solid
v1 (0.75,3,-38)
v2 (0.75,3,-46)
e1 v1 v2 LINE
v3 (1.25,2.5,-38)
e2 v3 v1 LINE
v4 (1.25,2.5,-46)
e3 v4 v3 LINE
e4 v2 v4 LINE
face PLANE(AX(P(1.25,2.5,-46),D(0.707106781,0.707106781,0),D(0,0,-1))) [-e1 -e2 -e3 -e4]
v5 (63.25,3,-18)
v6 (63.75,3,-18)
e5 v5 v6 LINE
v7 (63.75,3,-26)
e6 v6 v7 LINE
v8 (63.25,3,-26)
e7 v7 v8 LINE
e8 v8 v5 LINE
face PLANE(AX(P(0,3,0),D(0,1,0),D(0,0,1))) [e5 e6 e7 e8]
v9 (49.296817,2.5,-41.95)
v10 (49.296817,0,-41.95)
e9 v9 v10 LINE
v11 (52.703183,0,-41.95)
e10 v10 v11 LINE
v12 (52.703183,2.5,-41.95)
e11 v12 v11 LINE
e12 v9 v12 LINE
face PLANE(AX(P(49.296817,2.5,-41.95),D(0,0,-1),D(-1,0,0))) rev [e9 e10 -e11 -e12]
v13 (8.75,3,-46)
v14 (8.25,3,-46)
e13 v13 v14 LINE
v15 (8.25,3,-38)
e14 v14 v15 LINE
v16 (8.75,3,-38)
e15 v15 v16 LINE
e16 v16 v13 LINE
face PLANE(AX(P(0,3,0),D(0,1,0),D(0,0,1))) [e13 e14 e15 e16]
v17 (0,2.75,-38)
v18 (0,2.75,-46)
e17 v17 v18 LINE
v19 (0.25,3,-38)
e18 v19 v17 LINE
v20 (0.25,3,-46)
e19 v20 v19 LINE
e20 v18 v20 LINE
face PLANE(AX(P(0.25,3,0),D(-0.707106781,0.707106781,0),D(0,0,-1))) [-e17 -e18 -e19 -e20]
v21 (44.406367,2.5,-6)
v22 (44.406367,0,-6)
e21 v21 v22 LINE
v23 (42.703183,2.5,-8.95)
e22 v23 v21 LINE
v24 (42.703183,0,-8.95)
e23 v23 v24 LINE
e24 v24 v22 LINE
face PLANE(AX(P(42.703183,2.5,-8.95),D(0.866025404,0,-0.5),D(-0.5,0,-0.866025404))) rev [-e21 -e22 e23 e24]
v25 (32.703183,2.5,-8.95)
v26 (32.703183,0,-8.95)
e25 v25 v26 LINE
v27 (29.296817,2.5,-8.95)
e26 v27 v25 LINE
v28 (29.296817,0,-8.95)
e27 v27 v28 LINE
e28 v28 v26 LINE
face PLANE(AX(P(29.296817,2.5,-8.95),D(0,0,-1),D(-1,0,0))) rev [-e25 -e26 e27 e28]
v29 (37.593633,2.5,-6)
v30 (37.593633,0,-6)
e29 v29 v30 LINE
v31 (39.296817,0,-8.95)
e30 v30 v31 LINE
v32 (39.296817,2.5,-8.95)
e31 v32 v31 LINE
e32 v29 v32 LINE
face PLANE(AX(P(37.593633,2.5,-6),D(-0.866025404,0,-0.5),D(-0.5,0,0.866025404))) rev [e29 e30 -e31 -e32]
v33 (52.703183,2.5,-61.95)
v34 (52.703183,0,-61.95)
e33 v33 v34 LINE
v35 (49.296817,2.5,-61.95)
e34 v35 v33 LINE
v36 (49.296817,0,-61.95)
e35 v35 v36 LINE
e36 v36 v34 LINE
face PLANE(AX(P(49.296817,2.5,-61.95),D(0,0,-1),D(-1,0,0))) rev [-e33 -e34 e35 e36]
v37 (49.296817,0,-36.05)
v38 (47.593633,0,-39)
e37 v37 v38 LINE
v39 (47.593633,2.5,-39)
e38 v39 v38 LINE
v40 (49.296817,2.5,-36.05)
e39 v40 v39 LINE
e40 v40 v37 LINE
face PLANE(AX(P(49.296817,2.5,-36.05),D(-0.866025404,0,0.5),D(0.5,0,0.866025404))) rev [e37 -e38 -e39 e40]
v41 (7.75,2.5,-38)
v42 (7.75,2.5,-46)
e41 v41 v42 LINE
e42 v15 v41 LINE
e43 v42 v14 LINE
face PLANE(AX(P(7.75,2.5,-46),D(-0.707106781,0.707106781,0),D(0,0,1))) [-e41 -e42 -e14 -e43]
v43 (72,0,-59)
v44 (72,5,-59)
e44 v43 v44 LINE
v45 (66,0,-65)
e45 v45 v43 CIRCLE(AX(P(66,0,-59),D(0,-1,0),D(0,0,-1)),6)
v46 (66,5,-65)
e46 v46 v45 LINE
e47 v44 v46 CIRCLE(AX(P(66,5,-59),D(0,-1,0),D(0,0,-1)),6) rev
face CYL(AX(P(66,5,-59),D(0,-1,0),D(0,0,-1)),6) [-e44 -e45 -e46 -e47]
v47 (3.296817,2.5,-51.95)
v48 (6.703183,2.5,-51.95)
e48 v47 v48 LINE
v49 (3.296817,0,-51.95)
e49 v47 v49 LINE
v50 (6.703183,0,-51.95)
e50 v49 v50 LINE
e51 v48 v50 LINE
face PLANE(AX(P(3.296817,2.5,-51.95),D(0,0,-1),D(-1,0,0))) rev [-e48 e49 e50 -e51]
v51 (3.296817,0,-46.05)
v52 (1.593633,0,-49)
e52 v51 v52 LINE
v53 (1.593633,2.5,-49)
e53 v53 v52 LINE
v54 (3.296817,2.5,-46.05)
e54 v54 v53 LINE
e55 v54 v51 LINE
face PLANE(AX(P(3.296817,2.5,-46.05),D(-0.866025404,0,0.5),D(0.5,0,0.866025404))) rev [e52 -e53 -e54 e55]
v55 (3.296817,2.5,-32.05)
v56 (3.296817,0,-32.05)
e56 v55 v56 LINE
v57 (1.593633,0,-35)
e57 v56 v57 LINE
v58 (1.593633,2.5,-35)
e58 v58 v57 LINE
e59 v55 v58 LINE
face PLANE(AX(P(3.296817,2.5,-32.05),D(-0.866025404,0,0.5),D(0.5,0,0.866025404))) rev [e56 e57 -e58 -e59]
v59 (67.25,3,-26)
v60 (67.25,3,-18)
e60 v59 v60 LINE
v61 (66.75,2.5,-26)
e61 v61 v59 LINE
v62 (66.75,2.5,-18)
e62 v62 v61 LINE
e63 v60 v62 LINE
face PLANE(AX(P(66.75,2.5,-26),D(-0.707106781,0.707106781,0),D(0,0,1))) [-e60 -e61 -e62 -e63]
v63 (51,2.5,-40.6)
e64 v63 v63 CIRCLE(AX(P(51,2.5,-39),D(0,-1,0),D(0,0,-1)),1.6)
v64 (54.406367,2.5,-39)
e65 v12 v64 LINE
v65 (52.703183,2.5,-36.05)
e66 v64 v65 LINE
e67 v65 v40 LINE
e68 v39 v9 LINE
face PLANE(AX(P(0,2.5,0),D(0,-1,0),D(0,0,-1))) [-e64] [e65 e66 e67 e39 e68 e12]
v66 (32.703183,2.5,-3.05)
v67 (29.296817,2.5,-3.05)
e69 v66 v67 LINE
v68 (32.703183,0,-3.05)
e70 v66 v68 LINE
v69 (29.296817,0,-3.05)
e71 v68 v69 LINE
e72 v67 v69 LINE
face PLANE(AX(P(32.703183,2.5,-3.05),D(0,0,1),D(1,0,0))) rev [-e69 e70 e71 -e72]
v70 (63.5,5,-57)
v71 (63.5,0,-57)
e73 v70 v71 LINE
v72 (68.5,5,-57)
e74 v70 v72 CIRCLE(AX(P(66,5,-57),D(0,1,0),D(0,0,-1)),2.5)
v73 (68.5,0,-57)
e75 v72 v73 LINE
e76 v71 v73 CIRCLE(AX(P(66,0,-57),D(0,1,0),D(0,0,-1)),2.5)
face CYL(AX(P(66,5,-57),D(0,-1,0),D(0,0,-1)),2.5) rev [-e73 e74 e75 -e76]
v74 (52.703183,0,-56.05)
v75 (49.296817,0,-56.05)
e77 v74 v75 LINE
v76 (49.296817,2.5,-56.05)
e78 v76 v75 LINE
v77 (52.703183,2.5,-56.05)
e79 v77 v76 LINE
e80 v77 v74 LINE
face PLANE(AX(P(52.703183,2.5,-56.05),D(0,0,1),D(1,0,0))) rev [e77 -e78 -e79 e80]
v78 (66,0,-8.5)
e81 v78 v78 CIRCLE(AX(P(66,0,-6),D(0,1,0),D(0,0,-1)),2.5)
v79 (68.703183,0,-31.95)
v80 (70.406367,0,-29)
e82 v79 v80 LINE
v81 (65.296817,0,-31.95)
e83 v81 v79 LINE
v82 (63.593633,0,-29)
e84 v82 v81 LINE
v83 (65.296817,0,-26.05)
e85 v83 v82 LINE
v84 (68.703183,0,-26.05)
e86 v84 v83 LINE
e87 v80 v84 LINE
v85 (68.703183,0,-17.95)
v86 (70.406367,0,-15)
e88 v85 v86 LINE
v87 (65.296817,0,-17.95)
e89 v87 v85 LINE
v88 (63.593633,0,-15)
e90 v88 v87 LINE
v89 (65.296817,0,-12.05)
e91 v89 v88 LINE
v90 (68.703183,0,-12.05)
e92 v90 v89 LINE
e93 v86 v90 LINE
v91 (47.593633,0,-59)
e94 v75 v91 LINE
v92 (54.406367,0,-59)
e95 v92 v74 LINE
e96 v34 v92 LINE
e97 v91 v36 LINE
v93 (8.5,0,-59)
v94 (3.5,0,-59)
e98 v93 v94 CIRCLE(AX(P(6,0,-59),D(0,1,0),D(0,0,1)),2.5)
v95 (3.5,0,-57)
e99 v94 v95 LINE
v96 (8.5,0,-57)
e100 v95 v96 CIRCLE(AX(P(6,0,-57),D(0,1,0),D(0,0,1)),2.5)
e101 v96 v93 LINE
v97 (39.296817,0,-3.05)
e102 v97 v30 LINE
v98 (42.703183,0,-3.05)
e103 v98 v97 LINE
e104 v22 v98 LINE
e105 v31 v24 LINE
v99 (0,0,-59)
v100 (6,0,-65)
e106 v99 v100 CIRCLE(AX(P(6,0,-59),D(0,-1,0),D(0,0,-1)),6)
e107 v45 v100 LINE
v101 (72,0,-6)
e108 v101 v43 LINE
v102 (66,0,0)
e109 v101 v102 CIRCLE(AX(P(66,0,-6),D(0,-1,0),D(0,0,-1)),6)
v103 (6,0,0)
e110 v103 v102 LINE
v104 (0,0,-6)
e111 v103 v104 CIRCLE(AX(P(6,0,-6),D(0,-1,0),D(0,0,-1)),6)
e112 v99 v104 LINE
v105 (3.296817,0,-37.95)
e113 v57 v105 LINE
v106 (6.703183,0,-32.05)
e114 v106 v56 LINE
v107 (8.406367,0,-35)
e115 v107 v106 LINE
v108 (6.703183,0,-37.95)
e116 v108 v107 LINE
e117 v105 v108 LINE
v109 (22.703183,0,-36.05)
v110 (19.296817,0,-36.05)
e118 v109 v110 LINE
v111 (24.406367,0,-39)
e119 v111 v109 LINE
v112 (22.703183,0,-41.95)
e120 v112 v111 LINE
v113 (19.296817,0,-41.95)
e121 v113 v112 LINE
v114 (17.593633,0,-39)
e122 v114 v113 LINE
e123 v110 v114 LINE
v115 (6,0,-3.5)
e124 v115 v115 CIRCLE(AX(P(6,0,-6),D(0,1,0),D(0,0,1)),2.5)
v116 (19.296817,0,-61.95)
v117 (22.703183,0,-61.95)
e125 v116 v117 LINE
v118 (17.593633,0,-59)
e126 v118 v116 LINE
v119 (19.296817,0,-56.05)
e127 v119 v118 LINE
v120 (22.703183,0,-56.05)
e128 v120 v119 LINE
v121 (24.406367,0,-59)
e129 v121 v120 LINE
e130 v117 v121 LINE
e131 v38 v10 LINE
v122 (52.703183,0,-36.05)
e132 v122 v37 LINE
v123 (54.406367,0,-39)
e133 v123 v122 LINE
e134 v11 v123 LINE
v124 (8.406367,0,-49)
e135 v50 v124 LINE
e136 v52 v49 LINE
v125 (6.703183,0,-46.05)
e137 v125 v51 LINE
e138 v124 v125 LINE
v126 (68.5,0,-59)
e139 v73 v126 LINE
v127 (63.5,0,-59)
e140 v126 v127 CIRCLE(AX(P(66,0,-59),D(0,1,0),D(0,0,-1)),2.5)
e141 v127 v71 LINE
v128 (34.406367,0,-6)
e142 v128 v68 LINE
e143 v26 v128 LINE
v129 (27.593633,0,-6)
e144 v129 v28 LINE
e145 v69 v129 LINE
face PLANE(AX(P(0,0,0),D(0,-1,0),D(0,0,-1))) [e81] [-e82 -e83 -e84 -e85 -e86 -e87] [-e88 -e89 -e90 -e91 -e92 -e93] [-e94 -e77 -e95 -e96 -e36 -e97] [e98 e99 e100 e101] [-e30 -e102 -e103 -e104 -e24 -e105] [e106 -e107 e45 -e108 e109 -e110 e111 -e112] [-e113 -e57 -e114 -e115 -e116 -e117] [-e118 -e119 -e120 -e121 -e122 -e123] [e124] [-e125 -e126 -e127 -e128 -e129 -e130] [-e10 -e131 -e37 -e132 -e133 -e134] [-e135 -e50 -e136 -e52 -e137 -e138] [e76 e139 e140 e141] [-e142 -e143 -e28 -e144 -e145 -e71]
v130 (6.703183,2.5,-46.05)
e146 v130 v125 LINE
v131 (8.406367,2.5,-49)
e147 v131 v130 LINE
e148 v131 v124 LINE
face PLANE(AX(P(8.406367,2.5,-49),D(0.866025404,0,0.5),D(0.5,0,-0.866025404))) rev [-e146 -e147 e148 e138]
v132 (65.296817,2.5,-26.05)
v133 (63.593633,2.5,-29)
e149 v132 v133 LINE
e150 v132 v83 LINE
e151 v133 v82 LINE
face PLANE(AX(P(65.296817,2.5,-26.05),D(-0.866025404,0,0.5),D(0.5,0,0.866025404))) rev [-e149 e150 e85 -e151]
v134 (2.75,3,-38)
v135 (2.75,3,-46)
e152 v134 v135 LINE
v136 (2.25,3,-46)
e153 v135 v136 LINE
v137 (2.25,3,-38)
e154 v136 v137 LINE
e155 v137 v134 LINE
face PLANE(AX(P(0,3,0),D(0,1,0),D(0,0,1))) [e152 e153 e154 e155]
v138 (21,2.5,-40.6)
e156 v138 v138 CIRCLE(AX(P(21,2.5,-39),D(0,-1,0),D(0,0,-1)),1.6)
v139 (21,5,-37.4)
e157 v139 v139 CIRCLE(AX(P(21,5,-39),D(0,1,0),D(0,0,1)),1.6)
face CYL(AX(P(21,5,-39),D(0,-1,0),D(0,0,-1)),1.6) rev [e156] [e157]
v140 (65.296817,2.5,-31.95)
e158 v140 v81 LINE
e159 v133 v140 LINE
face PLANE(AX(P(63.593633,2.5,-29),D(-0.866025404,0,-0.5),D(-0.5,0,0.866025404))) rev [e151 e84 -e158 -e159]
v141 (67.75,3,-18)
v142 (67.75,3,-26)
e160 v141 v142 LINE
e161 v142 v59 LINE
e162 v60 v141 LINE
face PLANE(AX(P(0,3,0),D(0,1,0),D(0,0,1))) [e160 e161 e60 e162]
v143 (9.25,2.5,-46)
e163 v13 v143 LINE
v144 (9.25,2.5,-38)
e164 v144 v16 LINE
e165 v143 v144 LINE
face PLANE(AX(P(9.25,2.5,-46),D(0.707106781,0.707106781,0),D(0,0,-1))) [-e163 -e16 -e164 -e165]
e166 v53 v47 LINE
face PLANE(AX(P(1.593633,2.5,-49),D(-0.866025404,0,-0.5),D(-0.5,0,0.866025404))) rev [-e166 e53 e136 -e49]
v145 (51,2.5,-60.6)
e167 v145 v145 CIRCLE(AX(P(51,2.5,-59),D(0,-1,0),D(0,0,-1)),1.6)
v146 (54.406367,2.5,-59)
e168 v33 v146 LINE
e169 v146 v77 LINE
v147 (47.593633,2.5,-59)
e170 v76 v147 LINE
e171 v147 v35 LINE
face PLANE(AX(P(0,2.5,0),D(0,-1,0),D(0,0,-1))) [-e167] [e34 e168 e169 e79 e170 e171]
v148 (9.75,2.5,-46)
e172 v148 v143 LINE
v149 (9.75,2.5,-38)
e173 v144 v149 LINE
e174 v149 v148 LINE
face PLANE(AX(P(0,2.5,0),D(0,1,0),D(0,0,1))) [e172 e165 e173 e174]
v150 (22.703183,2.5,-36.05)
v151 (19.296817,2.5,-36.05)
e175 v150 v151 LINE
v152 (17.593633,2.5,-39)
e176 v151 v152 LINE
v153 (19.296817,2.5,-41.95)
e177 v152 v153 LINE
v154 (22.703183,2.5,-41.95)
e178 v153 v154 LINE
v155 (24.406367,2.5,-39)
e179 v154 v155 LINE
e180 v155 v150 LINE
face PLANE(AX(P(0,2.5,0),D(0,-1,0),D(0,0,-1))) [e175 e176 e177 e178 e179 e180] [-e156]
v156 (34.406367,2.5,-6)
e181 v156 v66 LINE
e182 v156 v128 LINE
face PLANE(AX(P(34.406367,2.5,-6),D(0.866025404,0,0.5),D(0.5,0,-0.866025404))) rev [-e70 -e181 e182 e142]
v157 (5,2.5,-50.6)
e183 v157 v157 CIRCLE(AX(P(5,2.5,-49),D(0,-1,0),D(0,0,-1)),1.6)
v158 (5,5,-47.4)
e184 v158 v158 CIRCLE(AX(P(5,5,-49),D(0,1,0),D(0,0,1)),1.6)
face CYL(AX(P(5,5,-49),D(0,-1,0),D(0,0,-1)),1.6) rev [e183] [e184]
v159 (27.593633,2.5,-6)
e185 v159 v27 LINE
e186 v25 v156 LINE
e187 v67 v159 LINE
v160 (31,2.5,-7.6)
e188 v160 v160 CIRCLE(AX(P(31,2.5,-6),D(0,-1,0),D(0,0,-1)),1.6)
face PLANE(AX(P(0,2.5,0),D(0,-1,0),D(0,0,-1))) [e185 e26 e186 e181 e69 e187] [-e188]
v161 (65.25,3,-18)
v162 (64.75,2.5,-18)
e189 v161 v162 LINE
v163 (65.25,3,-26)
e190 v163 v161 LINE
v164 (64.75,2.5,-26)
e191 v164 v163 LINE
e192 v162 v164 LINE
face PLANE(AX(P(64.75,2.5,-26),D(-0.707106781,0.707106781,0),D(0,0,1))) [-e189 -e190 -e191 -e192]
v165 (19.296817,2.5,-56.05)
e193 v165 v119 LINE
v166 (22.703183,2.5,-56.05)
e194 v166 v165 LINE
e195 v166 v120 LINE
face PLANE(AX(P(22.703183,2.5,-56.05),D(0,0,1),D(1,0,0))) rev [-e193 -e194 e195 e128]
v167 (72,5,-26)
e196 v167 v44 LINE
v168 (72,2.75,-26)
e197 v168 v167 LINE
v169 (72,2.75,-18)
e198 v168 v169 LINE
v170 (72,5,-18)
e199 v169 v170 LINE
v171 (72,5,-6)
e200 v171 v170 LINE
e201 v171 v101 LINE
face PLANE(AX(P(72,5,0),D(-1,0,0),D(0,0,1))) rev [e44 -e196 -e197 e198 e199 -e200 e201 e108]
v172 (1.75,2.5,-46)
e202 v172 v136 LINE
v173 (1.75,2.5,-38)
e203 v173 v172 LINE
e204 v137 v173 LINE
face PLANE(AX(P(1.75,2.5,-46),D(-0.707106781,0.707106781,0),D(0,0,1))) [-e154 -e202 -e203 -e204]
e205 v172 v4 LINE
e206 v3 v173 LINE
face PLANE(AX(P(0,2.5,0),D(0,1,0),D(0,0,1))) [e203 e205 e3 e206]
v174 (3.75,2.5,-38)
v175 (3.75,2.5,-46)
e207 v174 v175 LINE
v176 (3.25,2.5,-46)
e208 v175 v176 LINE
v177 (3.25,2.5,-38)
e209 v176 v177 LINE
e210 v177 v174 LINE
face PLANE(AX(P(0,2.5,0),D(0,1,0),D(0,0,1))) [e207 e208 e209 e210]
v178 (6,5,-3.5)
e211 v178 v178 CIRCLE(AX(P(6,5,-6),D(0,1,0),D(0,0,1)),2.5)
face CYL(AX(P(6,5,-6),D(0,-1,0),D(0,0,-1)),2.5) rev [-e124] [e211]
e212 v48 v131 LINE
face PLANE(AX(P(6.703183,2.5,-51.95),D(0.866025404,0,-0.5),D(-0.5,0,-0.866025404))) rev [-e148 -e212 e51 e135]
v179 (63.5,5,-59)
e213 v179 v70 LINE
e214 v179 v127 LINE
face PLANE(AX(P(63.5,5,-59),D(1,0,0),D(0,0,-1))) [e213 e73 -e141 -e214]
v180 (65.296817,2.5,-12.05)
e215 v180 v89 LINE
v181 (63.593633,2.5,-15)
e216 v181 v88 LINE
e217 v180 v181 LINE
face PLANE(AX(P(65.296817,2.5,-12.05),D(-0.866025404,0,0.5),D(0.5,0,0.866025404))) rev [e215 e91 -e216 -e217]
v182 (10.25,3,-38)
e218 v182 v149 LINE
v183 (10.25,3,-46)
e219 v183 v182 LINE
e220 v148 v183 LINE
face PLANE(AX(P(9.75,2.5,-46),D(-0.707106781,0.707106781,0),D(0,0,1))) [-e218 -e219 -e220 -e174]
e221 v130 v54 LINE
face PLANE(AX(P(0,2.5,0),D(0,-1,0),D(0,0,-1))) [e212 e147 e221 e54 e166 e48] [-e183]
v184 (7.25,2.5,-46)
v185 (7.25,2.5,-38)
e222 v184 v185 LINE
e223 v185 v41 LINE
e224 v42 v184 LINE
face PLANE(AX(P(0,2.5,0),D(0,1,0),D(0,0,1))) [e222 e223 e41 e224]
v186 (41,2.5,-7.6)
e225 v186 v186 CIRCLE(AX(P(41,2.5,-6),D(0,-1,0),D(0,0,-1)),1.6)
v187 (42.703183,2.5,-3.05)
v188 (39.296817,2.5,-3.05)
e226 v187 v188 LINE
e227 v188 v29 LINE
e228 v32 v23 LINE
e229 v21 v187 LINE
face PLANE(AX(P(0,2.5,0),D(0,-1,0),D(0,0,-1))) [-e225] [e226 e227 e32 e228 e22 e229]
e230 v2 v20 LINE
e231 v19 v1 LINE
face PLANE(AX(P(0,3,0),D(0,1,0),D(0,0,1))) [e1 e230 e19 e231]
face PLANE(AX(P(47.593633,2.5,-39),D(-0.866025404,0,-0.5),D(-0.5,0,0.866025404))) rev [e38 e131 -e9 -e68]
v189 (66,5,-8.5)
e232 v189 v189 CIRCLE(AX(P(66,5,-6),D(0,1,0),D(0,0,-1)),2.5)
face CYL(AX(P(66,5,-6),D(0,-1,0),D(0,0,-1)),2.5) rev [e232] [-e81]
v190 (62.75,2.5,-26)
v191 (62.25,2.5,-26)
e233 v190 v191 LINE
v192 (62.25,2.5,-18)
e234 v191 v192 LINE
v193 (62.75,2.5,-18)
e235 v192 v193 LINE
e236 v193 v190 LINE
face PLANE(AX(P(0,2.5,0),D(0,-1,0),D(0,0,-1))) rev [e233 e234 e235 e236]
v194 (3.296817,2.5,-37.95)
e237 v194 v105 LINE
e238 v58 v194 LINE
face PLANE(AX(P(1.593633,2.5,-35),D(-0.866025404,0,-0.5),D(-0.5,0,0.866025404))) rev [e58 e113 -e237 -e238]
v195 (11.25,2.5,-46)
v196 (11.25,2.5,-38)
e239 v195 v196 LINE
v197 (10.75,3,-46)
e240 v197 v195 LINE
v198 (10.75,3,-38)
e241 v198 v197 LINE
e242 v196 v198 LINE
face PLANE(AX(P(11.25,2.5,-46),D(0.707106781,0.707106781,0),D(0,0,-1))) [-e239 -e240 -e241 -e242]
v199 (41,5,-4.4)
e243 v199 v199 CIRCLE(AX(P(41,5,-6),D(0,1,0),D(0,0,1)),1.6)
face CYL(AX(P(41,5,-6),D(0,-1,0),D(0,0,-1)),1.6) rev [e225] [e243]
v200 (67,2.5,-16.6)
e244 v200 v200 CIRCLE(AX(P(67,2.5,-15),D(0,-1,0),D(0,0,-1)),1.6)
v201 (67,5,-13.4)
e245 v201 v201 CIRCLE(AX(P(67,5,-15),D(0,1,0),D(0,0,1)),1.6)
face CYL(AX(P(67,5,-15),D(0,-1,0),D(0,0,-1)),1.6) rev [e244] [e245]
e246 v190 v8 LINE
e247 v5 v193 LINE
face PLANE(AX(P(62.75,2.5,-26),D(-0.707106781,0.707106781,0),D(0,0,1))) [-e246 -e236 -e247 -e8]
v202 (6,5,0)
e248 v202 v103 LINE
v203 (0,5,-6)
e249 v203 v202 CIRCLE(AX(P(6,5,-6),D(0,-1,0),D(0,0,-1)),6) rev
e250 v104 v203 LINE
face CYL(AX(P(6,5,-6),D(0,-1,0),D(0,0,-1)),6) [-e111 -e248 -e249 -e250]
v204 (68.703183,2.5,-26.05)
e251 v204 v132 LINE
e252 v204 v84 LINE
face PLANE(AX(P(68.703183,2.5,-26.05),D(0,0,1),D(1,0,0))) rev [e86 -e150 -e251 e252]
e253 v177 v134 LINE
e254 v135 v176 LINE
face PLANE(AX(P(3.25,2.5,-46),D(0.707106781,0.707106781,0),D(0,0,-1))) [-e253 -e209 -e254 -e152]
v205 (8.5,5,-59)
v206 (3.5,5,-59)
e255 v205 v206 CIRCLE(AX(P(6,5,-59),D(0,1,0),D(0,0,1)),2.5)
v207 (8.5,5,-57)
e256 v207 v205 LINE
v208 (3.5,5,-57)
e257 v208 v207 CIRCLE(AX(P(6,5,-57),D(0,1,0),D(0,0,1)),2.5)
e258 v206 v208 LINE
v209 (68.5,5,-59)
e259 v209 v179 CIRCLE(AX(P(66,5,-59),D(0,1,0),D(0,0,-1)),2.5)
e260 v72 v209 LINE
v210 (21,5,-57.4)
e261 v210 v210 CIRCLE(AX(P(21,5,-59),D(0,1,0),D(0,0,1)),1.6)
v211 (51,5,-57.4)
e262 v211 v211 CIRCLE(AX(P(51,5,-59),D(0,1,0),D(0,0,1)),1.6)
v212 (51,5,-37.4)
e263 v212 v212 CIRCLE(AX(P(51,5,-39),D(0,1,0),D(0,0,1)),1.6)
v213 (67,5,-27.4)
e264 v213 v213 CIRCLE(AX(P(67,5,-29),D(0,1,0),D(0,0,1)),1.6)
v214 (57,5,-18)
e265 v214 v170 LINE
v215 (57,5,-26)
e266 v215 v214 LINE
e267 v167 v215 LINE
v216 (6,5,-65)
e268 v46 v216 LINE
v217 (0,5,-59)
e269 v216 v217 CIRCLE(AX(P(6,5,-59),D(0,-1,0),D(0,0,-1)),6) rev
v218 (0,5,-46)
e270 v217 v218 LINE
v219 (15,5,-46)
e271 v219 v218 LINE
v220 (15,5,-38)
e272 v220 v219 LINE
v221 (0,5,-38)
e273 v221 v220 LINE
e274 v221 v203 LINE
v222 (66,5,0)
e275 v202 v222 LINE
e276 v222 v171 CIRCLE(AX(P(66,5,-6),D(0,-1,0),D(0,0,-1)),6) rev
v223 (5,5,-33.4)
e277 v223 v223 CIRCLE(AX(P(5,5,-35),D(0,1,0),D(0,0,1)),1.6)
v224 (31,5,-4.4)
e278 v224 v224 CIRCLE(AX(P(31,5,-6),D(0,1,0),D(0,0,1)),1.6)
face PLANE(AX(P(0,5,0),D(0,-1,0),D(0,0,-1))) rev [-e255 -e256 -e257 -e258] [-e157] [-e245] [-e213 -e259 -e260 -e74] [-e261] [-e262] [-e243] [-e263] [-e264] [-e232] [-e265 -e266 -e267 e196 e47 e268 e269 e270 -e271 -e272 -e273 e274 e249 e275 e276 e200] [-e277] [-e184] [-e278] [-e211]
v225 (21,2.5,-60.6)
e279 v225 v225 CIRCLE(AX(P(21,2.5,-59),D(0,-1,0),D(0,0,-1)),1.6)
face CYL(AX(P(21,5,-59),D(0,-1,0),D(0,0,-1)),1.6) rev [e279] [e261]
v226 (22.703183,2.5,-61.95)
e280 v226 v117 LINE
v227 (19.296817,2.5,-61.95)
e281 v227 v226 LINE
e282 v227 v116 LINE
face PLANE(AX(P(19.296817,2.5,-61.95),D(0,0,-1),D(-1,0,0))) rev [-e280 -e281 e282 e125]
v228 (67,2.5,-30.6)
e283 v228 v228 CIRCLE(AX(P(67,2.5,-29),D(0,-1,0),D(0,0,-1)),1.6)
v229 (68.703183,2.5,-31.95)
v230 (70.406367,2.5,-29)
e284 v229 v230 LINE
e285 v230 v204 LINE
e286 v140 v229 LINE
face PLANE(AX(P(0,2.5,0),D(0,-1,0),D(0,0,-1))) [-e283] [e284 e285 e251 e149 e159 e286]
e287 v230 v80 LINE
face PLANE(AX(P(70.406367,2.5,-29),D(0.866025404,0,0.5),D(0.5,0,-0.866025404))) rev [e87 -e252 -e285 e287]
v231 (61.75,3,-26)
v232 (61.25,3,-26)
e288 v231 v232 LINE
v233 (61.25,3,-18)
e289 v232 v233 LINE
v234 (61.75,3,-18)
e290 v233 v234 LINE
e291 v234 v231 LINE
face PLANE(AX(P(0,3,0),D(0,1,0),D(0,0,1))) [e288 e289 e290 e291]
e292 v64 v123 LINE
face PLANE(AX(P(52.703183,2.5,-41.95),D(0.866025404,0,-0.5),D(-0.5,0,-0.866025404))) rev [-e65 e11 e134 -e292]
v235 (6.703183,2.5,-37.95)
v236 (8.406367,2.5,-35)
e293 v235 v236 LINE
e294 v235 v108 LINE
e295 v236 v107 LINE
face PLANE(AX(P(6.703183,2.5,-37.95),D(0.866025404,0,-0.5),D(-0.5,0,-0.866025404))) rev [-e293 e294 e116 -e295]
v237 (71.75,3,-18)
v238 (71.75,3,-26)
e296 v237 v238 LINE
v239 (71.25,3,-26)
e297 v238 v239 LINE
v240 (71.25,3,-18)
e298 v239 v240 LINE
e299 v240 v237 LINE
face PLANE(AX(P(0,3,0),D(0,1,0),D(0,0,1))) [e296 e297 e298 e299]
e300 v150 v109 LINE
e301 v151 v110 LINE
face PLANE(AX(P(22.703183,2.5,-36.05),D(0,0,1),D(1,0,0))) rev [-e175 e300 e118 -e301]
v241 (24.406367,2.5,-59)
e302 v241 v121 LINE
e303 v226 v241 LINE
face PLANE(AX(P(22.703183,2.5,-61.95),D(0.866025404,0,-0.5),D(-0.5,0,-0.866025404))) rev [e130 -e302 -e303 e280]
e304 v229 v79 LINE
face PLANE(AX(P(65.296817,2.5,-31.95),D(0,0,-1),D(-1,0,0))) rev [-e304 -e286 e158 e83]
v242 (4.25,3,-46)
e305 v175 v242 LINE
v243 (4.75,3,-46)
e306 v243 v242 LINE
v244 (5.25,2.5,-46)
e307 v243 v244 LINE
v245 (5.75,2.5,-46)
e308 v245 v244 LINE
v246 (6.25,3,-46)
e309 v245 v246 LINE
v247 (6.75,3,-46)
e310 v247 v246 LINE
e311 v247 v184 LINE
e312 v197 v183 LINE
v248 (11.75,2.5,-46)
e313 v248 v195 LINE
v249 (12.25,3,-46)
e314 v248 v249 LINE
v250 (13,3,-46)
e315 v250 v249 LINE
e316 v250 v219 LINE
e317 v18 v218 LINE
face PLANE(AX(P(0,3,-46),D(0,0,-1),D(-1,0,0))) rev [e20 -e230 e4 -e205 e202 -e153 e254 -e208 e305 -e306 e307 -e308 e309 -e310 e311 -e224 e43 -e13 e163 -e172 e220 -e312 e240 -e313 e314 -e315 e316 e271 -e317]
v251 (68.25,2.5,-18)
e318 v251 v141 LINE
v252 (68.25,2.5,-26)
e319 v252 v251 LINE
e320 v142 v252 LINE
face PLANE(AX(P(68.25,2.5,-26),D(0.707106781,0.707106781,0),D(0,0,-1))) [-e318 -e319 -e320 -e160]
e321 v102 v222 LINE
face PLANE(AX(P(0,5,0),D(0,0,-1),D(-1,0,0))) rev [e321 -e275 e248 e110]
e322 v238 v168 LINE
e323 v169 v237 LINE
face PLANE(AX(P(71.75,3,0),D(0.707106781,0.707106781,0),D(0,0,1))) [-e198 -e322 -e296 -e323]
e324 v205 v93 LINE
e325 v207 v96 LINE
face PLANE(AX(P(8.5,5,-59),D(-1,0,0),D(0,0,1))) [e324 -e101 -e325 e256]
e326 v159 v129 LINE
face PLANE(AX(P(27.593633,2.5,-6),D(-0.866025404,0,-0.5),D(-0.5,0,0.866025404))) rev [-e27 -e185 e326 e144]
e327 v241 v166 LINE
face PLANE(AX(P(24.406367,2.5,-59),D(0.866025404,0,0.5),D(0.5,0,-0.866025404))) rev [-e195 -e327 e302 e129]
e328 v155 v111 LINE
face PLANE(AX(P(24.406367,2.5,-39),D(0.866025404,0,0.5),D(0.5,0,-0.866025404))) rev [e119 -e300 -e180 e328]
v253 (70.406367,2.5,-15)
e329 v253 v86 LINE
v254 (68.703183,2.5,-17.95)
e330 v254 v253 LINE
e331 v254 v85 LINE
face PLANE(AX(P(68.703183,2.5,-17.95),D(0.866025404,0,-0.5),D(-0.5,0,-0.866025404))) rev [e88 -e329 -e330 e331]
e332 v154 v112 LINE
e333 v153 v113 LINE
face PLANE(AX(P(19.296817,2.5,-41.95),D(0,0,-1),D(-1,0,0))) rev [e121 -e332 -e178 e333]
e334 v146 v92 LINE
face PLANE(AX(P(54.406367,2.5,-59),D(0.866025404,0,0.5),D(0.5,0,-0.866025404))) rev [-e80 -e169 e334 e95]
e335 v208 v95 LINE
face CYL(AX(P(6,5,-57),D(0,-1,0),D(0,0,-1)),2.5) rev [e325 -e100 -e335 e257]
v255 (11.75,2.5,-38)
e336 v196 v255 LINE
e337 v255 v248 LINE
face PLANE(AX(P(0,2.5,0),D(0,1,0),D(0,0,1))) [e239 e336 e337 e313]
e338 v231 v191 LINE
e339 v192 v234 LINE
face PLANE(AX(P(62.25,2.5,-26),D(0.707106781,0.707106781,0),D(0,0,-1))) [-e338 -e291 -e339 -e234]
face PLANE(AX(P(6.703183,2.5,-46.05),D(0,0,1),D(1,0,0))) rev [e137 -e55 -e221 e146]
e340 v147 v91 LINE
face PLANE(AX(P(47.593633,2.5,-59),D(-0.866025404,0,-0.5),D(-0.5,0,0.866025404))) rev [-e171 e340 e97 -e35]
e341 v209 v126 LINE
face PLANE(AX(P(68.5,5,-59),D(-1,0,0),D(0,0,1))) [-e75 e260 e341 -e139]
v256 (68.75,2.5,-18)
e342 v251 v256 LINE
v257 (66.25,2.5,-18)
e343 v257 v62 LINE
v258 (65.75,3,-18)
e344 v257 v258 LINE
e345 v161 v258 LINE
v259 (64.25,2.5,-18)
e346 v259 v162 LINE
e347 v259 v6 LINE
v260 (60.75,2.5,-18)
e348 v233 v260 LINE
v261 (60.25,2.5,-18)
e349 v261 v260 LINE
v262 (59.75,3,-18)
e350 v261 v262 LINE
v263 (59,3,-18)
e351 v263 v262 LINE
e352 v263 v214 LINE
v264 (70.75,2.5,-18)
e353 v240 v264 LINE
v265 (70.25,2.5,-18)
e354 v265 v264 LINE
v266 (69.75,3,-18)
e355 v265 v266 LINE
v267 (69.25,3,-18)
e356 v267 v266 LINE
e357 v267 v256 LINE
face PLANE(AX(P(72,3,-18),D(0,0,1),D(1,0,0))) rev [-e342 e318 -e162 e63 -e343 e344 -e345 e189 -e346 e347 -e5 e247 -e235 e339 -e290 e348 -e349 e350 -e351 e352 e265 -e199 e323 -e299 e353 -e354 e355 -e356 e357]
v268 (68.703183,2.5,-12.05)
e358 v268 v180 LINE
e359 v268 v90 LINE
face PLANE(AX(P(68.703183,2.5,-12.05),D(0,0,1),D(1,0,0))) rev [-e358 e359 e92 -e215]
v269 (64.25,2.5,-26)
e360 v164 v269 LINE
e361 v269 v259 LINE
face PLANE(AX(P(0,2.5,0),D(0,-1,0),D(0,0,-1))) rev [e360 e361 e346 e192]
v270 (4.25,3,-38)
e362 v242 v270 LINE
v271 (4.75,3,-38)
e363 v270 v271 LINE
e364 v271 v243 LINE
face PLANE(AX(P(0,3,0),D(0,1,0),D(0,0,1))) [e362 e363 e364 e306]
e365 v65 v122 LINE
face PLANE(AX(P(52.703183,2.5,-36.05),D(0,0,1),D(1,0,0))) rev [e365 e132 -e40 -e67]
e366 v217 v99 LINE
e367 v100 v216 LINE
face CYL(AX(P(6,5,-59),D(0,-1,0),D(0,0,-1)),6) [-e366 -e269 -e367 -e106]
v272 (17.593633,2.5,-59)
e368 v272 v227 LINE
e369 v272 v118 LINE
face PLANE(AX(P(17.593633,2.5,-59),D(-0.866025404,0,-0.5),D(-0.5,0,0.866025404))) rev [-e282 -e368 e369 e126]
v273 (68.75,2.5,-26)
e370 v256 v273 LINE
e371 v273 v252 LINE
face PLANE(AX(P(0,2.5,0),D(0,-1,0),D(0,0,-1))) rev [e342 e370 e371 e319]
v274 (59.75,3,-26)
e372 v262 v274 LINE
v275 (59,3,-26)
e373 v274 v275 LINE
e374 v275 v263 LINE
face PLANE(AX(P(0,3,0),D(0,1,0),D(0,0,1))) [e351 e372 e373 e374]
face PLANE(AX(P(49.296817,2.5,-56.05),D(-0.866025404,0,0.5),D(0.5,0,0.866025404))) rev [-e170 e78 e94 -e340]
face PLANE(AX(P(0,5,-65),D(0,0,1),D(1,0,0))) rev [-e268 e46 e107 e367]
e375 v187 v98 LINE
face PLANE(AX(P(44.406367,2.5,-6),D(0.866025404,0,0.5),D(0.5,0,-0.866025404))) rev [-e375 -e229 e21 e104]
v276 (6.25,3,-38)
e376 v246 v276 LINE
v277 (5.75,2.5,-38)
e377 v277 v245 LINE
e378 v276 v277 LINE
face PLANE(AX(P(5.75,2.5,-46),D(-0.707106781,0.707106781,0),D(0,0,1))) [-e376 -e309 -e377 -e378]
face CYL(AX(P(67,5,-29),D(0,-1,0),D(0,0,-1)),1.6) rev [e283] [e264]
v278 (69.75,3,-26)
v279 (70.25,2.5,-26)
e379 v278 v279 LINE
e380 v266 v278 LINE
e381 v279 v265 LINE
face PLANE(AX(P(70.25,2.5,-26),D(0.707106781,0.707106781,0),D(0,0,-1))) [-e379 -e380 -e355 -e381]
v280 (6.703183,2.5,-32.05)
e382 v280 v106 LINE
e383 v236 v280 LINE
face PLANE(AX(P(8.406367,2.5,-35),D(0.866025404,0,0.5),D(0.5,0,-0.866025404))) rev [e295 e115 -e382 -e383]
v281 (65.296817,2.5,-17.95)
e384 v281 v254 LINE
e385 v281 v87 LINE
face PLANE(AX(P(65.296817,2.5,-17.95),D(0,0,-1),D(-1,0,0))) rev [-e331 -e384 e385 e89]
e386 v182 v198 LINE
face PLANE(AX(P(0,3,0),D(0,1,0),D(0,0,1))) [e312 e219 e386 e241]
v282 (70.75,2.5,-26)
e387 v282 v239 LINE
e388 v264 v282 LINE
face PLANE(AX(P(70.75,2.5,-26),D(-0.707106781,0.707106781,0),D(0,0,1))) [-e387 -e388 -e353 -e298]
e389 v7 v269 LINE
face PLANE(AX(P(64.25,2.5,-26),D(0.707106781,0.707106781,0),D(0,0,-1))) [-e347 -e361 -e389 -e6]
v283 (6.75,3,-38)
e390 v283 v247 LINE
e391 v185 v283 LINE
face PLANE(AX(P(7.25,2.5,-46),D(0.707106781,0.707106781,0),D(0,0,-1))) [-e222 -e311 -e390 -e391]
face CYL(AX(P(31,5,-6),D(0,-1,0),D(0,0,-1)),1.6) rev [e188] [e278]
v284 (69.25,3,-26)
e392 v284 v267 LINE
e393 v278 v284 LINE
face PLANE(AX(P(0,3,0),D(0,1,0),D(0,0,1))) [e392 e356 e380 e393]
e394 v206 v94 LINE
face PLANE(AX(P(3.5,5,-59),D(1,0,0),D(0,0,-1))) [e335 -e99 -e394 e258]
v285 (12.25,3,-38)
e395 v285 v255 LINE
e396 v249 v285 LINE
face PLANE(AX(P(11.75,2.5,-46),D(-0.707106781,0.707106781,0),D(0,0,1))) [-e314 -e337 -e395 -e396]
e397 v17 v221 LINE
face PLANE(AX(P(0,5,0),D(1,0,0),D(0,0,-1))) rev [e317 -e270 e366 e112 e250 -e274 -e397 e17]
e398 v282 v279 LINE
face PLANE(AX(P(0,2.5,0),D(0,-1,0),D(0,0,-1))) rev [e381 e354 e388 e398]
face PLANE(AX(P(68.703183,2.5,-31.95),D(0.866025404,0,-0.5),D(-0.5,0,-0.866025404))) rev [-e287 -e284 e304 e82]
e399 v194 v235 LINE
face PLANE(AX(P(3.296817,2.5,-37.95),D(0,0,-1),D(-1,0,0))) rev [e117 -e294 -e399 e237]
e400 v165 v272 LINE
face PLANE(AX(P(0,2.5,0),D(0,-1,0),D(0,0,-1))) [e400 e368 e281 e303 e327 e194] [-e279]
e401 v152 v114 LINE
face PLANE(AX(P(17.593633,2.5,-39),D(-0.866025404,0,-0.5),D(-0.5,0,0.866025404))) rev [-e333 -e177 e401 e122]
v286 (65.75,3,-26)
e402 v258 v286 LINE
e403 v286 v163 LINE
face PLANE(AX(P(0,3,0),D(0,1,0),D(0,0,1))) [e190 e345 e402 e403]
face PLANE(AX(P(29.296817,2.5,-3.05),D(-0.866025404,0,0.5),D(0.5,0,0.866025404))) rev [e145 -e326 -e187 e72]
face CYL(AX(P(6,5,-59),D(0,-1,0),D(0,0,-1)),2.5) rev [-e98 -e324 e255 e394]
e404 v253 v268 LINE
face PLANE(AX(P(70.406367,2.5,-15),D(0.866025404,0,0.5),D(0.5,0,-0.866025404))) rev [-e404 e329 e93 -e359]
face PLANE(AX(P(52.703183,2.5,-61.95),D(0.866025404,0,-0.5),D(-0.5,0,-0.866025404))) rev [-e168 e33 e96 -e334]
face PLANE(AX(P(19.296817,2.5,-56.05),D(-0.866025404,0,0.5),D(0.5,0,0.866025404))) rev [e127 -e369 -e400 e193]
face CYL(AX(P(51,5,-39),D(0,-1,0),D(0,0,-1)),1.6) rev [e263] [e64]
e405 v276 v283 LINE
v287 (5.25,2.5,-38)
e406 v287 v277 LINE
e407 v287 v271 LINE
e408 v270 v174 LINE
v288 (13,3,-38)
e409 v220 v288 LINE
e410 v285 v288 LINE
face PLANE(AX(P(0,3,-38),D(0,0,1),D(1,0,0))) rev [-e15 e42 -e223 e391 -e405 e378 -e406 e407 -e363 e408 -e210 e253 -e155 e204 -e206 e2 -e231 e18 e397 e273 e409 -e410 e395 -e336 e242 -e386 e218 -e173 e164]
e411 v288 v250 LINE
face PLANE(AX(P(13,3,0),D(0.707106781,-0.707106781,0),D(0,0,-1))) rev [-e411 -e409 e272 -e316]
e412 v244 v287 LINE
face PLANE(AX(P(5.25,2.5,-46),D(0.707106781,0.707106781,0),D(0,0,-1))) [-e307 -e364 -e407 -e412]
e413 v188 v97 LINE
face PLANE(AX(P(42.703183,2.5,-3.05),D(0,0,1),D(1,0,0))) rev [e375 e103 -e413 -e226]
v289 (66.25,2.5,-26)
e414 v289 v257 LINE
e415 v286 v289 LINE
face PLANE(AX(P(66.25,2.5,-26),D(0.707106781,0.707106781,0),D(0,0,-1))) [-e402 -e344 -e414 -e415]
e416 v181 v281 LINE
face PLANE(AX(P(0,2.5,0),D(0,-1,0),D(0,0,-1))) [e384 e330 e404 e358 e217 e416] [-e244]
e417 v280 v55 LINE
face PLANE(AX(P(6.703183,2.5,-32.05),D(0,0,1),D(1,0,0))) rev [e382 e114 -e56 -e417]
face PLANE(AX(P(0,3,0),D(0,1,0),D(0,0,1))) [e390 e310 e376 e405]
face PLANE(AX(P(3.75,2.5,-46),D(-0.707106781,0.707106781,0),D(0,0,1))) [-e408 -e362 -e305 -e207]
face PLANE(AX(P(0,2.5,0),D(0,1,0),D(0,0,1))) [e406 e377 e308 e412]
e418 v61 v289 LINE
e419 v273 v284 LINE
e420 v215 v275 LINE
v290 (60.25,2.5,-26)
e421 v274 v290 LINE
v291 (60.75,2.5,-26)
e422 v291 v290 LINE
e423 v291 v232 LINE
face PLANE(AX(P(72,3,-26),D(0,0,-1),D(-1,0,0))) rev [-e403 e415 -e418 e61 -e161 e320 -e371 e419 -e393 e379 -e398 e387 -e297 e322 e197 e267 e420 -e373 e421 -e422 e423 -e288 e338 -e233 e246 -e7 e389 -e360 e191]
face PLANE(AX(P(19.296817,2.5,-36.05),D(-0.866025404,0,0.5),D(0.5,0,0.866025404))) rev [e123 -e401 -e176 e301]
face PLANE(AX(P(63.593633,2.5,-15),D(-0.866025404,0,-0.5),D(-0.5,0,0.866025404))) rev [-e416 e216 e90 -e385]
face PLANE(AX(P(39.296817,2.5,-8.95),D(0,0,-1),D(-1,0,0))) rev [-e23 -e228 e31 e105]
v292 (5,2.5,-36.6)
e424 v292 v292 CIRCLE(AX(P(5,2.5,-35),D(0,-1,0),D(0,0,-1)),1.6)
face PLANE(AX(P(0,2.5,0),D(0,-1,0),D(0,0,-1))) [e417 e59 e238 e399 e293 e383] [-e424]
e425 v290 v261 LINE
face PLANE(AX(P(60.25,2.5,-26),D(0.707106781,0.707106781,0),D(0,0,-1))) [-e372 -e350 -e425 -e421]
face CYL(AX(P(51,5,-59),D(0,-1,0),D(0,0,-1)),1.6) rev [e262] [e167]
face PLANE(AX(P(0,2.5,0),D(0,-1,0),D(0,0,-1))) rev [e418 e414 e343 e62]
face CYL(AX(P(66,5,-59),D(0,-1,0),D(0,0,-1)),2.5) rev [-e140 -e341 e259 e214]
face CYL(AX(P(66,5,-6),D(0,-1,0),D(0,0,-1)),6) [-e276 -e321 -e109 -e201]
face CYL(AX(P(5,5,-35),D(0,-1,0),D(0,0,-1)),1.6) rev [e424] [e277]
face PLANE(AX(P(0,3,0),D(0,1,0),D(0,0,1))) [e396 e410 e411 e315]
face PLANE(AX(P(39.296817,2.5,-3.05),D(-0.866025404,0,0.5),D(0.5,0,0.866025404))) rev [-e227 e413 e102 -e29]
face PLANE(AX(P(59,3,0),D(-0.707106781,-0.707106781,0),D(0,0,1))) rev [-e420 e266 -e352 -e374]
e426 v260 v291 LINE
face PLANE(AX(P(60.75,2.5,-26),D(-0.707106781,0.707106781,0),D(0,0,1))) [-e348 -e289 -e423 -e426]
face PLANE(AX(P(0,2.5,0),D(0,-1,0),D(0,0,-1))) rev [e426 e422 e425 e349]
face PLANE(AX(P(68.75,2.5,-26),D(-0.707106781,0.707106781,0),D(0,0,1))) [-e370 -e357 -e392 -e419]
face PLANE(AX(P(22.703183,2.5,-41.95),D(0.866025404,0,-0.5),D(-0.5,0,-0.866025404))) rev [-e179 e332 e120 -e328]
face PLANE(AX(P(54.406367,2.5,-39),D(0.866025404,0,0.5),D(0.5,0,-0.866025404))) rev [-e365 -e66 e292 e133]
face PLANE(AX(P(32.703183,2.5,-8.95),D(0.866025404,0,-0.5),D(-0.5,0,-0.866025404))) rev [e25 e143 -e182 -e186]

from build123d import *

# Parameters (mm, degrees)
SKETCH1_W           = 72
SKETCH1_H           = 65
SKETCH1_R           = 2.5
SKETCH1_R_2         = 1.6
BOSS_EXTRUDE1_DEPTH = 5
FILLET1_R           = 6
SKETCH2_W           = 15
SKETCH2_H           = 8
CUT_EXTRUDE1_DEPTH  = 2
CHAMFER1_SIZE       = 2
SKETCH3_W           = 0.5
SKETCH3_H           = 8
CUT_EXTRUDE2_DEPTH  = 0.5
CHAMFER2_SIZE       = 0.5
CHAMFER3_SIZE       = 0.25
CUT_EXTRUDE3_DEPTH  = 2.5


with BuildPart() as part:
    # Sketch1 → Boss-Extrude1 (new body)
    with BuildSketch(Plane(origin=(0, 0, 0), x_dir=(1, 0, 0), z_dir=(0, 1, 0))):
        with Locations((36, 32.5)):
            Rectangle(SKETCH1_W, SKETCH1_H)
        with Locations(Location((6, 6, 0), (0, 0, 270))):
            Circle(SKETCH1_R, mode=Mode.SUBTRACT)
        with Locations(Location((66, 6, 0), (0, 0, 90))):
            Circle(SKETCH1_R, mode=Mode.SUBTRACT)
        with Locations(Location((5, 49, 0), (0, 0, 270))):
            Circle(SKETCH1_R_2, mode=Mode.SUBTRACT)
        with Locations(Location((5, 35, 0), (0, 0, 270))):
            Circle(SKETCH1_R_2, mode=Mode.SUBTRACT)
        with Locations(Location((21, 39, 0), (0, 0, 270))):
            Circle(SKETCH1_R_2, mode=Mode.SUBTRACT)
        with Locations(Location((21, 59, 0), (0, 0, 270))):
            Circle(SKETCH1_R_2, mode=Mode.SUBTRACT)
        with Locations(Location((51, 59, 0), (0, 0, 270))):
            Circle(SKETCH1_R_2, mode=Mode.SUBTRACT)
        with Locations(Location((51, 39, 0), (0, 0, 270))):
            Circle(SKETCH1_R_2, mode=Mode.SUBTRACT)
        with Locations(Location((67, 29, 0), (0, 0, 270))):
            Circle(SKETCH1_R_2, mode=Mode.SUBTRACT)
        with Locations(Location((67, 15, 0), (0, 0, 270))):
            Circle(SKETCH1_R_2, mode=Mode.SUBTRACT)
        with Locations(Location((41, 6, 0), (0, 0, 270))):
            Circle(SKETCH1_R_2, mode=Mode.SUBTRACT)
        with Locations(Location((31, 6, 0), (0, 0, 270))):
            Circle(SKETCH1_R_2, mode=Mode.SUBTRACT)
        with BuildLine():
            Line((8.5, 59), (8.5, 57))
            ThreePointArc((8.5, 57), (6, 54.5), (3.5, 57))
            Line((3.5, 57), (3.5, 59))
            ThreePointArc((3.5, 59), (6, 61.5), (8.5, 59))
        make_face(mode=Mode.SUBTRACT)
        with BuildLine():
            Line((68.5, 59), (68.5, 57))
            ThreePointArc((68.5, 57), (66, 54.5), (63.5, 57))
            Line((63.5, 57), (63.5, 59))
            ThreePointArc((63.5, 59), (66, 61.5), (68.5, 59))
        make_face(mode=Mode.SUBTRACT)
    extrude(amount=BOSS_EXTRUDE1_DEPTH)

    # Fillet1
    fillet1_edges = [part.edges().sort_by_distance(p)[0] for p in [
        (0, 2.5, -65),
        (72, 2.5, -65),
        (72, 2.5, 0),
        (0, 2.5, 0),
    ]]
    fillet(fillet1_edges, radius=FILLET1_R)

    # Sketch2 → Cut-Extrude1 (cut)
    with BuildSketch(Plane(origin=(0, 5, 0), x_dir=(1, 0, 0), z_dir=(0, 1, 0))):
        with Locations((7.5, 42)):
            Rectangle(SKETCH2_W, SKETCH2_H)
        with Locations((64.5, 22)):
            Rectangle(SKETCH2_W, SKETCH2_H)
    extrude(amount=-CUT_EXTRUDE1_DEPTH, mode=Mode.SUBTRACT)

    # Chamfer1
    chamfer1_edges = [part.edges().sort_by_distance(p)[0] for p in [
        (57, 3, -22),
        (15, 3, -42),
    ]]
    chamfer(chamfer1_edges, length=CHAMFER1_SIZE - 0.0001)  # a hair under: the kernel refuses the full size

    # Sketch3 → Cut-Extrude2 (cut)
    with BuildSketch(Plane(origin=(0, 3, 0), x_dir=(1, 0, 0), z_dir=(0, 1, 0))):
        with Locations((1.5, 42)):
            Rectangle(SKETCH3_W, SKETCH3_H)
        with Locations((3.5, 42)):
            Rectangle(SKETCH3_W, SKETCH3_H)
        with Locations((5.5, 42)):
            Rectangle(SKETCH3_W, SKETCH3_H)
        with Locations((11.5, 42)):
            Rectangle(SKETCH3_W, SKETCH3_H)
        with Locations((7.5, 42)):
            Rectangle(SKETCH3_W, SKETCH3_H)
        with Locations((9.5, 42)):
            Rectangle(SKETCH3_W, SKETCH3_H)
        with Locations((70.5, 22)):
            Rectangle(SKETCH3_W, SKETCH3_H)
        with Locations((68.5, 22)):
            Rectangle(SKETCH3_W, SKETCH3_H)
        with Locations((66.5, 22)):
            Rectangle(SKETCH3_W, SKETCH3_H)
        with Locations((64.5, 22)):
            Rectangle(SKETCH3_W, SKETCH3_H)
        with Locations((62.5, 22)):
            Rectangle(SKETCH3_W, SKETCH3_H)
        with Locations((60.5, 22)):
            Rectangle(SKETCH3_W, SKETCH3_H)
    extrude(amount=-CUT_EXTRUDE2_DEPTH, mode=Mode.SUBTRACT)

    # Chamfer2
    chamfer2_edges = [part.edges().sort_by_distance(p)[0] for p in [
        (70.75, 3, -22),
        (70.25, 3, -22),
        (68.75, 3, -22),
        (68.25, 3, -22),
        (66.75, 3, -22),
        (66.25, 3, -22),
        (64.75, 3, -22),
        (64.25, 3, -22),
        (62.75, 3, -22),
        (62.25, 3, -22),
        (60.75, 3, -22),
        (60.25, 3, -22),
        (11.75, 3, -42),
        (11.25, 3, -42),
        (9.75, 3, -42),
        (9.25, 3, -42),
        (7.75, 3, -42),
        (7.25, 3, -42),
        (5.75, 3, -42),
        (5.25, 3, -42),
        (3.75, 3, -42),
        (3.25, 3, -42),
        (1.75, 3, -42),
        (1.25, 3, -42),
    ]]
    chamfer(chamfer2_edges, length=CHAMFER2_SIZE - 0.0001)  # a hair under: the kernel refuses the full size

    # Chamfer3
    chamfer3_edges = [part.edges().sort_by_distance(p)[0] for p in [
        (0, 3, -42),
        (72, 3, -22),
    ]]
    chamfer(chamfer3_edges, length=CHAMFER3_SIZE)

    # Sketch4 → Cut-Extrude3 (cut)
    with BuildSketch(Plane.XZ):
        Polygon((8.406366588, -49), (6.703183294, -46.05), (3.296816706, -46.05), (1.593633412, -49), (3.296816706, -51.95), (6.703183294, -51.95), align=None)
        Polygon((8.406366588, -35), (6.703183294, -32.05), (3.296816706, -32.05), (1.593633412, -35), (3.296816706, -37.95), (6.703183294, -37.95), align=None)
        Polygon((24.406366588, -39), (22.703183294, -36.05), (19.296816706, -36.05), (17.593633412, -39), (19.296816706, -41.95), (22.703183294, -41.95), align=None)
        Polygon((54.406366588, -39), (52.703183294, -36.05), (49.296816706, -36.05), (47.593633412, -39), (49.296816706, -41.95), (52.703183294, -41.95), align=None)
        Polygon((54.406366588, -59), (52.703183294, -56.05), (49.296816706, -56.05), (47.593633412, -59), (49.296816706, -61.95), (52.703183294, -61.95), align=None)
        Polygon((24.406366588, -59), (22.703183294, -56.05), (19.296816706, -56.05), (17.593633412, -59), (19.296816706, -61.95), (22.703183294, -61.95), align=None)
        Polygon((34.406366588, -6), (32.703183294, -3.05), (29.296816706, -3.05), (27.593633412, -6), (29.296816706, -8.95), (32.703183294, -8.95), align=None)
        Polygon((44.406366588, -6), (42.703183294, -3.05), (39.296816706, -3.05), (37.593633412, -6), (39.296816706, -8.95), (42.703183294, -8.95), align=None)
        Polygon((70.406366588, -15), (68.703183294, -12.05), (65.296816706, -12.05), (63.593633412, -15), (65.296816706, -17.95), (68.703183294, -17.95), align=None)
        Polygon((70.406366588, -29), (68.703183294, -26.05), (65.296816706, -26.05), (63.593633412, -29), (65.296816706, -31.95), (68.703183294, -31.95), align=None)
    extrude(amount=-CUT_EXTRUDE3_DEPTH, mode=Mode.SUBTRACT)


solid = part.part
